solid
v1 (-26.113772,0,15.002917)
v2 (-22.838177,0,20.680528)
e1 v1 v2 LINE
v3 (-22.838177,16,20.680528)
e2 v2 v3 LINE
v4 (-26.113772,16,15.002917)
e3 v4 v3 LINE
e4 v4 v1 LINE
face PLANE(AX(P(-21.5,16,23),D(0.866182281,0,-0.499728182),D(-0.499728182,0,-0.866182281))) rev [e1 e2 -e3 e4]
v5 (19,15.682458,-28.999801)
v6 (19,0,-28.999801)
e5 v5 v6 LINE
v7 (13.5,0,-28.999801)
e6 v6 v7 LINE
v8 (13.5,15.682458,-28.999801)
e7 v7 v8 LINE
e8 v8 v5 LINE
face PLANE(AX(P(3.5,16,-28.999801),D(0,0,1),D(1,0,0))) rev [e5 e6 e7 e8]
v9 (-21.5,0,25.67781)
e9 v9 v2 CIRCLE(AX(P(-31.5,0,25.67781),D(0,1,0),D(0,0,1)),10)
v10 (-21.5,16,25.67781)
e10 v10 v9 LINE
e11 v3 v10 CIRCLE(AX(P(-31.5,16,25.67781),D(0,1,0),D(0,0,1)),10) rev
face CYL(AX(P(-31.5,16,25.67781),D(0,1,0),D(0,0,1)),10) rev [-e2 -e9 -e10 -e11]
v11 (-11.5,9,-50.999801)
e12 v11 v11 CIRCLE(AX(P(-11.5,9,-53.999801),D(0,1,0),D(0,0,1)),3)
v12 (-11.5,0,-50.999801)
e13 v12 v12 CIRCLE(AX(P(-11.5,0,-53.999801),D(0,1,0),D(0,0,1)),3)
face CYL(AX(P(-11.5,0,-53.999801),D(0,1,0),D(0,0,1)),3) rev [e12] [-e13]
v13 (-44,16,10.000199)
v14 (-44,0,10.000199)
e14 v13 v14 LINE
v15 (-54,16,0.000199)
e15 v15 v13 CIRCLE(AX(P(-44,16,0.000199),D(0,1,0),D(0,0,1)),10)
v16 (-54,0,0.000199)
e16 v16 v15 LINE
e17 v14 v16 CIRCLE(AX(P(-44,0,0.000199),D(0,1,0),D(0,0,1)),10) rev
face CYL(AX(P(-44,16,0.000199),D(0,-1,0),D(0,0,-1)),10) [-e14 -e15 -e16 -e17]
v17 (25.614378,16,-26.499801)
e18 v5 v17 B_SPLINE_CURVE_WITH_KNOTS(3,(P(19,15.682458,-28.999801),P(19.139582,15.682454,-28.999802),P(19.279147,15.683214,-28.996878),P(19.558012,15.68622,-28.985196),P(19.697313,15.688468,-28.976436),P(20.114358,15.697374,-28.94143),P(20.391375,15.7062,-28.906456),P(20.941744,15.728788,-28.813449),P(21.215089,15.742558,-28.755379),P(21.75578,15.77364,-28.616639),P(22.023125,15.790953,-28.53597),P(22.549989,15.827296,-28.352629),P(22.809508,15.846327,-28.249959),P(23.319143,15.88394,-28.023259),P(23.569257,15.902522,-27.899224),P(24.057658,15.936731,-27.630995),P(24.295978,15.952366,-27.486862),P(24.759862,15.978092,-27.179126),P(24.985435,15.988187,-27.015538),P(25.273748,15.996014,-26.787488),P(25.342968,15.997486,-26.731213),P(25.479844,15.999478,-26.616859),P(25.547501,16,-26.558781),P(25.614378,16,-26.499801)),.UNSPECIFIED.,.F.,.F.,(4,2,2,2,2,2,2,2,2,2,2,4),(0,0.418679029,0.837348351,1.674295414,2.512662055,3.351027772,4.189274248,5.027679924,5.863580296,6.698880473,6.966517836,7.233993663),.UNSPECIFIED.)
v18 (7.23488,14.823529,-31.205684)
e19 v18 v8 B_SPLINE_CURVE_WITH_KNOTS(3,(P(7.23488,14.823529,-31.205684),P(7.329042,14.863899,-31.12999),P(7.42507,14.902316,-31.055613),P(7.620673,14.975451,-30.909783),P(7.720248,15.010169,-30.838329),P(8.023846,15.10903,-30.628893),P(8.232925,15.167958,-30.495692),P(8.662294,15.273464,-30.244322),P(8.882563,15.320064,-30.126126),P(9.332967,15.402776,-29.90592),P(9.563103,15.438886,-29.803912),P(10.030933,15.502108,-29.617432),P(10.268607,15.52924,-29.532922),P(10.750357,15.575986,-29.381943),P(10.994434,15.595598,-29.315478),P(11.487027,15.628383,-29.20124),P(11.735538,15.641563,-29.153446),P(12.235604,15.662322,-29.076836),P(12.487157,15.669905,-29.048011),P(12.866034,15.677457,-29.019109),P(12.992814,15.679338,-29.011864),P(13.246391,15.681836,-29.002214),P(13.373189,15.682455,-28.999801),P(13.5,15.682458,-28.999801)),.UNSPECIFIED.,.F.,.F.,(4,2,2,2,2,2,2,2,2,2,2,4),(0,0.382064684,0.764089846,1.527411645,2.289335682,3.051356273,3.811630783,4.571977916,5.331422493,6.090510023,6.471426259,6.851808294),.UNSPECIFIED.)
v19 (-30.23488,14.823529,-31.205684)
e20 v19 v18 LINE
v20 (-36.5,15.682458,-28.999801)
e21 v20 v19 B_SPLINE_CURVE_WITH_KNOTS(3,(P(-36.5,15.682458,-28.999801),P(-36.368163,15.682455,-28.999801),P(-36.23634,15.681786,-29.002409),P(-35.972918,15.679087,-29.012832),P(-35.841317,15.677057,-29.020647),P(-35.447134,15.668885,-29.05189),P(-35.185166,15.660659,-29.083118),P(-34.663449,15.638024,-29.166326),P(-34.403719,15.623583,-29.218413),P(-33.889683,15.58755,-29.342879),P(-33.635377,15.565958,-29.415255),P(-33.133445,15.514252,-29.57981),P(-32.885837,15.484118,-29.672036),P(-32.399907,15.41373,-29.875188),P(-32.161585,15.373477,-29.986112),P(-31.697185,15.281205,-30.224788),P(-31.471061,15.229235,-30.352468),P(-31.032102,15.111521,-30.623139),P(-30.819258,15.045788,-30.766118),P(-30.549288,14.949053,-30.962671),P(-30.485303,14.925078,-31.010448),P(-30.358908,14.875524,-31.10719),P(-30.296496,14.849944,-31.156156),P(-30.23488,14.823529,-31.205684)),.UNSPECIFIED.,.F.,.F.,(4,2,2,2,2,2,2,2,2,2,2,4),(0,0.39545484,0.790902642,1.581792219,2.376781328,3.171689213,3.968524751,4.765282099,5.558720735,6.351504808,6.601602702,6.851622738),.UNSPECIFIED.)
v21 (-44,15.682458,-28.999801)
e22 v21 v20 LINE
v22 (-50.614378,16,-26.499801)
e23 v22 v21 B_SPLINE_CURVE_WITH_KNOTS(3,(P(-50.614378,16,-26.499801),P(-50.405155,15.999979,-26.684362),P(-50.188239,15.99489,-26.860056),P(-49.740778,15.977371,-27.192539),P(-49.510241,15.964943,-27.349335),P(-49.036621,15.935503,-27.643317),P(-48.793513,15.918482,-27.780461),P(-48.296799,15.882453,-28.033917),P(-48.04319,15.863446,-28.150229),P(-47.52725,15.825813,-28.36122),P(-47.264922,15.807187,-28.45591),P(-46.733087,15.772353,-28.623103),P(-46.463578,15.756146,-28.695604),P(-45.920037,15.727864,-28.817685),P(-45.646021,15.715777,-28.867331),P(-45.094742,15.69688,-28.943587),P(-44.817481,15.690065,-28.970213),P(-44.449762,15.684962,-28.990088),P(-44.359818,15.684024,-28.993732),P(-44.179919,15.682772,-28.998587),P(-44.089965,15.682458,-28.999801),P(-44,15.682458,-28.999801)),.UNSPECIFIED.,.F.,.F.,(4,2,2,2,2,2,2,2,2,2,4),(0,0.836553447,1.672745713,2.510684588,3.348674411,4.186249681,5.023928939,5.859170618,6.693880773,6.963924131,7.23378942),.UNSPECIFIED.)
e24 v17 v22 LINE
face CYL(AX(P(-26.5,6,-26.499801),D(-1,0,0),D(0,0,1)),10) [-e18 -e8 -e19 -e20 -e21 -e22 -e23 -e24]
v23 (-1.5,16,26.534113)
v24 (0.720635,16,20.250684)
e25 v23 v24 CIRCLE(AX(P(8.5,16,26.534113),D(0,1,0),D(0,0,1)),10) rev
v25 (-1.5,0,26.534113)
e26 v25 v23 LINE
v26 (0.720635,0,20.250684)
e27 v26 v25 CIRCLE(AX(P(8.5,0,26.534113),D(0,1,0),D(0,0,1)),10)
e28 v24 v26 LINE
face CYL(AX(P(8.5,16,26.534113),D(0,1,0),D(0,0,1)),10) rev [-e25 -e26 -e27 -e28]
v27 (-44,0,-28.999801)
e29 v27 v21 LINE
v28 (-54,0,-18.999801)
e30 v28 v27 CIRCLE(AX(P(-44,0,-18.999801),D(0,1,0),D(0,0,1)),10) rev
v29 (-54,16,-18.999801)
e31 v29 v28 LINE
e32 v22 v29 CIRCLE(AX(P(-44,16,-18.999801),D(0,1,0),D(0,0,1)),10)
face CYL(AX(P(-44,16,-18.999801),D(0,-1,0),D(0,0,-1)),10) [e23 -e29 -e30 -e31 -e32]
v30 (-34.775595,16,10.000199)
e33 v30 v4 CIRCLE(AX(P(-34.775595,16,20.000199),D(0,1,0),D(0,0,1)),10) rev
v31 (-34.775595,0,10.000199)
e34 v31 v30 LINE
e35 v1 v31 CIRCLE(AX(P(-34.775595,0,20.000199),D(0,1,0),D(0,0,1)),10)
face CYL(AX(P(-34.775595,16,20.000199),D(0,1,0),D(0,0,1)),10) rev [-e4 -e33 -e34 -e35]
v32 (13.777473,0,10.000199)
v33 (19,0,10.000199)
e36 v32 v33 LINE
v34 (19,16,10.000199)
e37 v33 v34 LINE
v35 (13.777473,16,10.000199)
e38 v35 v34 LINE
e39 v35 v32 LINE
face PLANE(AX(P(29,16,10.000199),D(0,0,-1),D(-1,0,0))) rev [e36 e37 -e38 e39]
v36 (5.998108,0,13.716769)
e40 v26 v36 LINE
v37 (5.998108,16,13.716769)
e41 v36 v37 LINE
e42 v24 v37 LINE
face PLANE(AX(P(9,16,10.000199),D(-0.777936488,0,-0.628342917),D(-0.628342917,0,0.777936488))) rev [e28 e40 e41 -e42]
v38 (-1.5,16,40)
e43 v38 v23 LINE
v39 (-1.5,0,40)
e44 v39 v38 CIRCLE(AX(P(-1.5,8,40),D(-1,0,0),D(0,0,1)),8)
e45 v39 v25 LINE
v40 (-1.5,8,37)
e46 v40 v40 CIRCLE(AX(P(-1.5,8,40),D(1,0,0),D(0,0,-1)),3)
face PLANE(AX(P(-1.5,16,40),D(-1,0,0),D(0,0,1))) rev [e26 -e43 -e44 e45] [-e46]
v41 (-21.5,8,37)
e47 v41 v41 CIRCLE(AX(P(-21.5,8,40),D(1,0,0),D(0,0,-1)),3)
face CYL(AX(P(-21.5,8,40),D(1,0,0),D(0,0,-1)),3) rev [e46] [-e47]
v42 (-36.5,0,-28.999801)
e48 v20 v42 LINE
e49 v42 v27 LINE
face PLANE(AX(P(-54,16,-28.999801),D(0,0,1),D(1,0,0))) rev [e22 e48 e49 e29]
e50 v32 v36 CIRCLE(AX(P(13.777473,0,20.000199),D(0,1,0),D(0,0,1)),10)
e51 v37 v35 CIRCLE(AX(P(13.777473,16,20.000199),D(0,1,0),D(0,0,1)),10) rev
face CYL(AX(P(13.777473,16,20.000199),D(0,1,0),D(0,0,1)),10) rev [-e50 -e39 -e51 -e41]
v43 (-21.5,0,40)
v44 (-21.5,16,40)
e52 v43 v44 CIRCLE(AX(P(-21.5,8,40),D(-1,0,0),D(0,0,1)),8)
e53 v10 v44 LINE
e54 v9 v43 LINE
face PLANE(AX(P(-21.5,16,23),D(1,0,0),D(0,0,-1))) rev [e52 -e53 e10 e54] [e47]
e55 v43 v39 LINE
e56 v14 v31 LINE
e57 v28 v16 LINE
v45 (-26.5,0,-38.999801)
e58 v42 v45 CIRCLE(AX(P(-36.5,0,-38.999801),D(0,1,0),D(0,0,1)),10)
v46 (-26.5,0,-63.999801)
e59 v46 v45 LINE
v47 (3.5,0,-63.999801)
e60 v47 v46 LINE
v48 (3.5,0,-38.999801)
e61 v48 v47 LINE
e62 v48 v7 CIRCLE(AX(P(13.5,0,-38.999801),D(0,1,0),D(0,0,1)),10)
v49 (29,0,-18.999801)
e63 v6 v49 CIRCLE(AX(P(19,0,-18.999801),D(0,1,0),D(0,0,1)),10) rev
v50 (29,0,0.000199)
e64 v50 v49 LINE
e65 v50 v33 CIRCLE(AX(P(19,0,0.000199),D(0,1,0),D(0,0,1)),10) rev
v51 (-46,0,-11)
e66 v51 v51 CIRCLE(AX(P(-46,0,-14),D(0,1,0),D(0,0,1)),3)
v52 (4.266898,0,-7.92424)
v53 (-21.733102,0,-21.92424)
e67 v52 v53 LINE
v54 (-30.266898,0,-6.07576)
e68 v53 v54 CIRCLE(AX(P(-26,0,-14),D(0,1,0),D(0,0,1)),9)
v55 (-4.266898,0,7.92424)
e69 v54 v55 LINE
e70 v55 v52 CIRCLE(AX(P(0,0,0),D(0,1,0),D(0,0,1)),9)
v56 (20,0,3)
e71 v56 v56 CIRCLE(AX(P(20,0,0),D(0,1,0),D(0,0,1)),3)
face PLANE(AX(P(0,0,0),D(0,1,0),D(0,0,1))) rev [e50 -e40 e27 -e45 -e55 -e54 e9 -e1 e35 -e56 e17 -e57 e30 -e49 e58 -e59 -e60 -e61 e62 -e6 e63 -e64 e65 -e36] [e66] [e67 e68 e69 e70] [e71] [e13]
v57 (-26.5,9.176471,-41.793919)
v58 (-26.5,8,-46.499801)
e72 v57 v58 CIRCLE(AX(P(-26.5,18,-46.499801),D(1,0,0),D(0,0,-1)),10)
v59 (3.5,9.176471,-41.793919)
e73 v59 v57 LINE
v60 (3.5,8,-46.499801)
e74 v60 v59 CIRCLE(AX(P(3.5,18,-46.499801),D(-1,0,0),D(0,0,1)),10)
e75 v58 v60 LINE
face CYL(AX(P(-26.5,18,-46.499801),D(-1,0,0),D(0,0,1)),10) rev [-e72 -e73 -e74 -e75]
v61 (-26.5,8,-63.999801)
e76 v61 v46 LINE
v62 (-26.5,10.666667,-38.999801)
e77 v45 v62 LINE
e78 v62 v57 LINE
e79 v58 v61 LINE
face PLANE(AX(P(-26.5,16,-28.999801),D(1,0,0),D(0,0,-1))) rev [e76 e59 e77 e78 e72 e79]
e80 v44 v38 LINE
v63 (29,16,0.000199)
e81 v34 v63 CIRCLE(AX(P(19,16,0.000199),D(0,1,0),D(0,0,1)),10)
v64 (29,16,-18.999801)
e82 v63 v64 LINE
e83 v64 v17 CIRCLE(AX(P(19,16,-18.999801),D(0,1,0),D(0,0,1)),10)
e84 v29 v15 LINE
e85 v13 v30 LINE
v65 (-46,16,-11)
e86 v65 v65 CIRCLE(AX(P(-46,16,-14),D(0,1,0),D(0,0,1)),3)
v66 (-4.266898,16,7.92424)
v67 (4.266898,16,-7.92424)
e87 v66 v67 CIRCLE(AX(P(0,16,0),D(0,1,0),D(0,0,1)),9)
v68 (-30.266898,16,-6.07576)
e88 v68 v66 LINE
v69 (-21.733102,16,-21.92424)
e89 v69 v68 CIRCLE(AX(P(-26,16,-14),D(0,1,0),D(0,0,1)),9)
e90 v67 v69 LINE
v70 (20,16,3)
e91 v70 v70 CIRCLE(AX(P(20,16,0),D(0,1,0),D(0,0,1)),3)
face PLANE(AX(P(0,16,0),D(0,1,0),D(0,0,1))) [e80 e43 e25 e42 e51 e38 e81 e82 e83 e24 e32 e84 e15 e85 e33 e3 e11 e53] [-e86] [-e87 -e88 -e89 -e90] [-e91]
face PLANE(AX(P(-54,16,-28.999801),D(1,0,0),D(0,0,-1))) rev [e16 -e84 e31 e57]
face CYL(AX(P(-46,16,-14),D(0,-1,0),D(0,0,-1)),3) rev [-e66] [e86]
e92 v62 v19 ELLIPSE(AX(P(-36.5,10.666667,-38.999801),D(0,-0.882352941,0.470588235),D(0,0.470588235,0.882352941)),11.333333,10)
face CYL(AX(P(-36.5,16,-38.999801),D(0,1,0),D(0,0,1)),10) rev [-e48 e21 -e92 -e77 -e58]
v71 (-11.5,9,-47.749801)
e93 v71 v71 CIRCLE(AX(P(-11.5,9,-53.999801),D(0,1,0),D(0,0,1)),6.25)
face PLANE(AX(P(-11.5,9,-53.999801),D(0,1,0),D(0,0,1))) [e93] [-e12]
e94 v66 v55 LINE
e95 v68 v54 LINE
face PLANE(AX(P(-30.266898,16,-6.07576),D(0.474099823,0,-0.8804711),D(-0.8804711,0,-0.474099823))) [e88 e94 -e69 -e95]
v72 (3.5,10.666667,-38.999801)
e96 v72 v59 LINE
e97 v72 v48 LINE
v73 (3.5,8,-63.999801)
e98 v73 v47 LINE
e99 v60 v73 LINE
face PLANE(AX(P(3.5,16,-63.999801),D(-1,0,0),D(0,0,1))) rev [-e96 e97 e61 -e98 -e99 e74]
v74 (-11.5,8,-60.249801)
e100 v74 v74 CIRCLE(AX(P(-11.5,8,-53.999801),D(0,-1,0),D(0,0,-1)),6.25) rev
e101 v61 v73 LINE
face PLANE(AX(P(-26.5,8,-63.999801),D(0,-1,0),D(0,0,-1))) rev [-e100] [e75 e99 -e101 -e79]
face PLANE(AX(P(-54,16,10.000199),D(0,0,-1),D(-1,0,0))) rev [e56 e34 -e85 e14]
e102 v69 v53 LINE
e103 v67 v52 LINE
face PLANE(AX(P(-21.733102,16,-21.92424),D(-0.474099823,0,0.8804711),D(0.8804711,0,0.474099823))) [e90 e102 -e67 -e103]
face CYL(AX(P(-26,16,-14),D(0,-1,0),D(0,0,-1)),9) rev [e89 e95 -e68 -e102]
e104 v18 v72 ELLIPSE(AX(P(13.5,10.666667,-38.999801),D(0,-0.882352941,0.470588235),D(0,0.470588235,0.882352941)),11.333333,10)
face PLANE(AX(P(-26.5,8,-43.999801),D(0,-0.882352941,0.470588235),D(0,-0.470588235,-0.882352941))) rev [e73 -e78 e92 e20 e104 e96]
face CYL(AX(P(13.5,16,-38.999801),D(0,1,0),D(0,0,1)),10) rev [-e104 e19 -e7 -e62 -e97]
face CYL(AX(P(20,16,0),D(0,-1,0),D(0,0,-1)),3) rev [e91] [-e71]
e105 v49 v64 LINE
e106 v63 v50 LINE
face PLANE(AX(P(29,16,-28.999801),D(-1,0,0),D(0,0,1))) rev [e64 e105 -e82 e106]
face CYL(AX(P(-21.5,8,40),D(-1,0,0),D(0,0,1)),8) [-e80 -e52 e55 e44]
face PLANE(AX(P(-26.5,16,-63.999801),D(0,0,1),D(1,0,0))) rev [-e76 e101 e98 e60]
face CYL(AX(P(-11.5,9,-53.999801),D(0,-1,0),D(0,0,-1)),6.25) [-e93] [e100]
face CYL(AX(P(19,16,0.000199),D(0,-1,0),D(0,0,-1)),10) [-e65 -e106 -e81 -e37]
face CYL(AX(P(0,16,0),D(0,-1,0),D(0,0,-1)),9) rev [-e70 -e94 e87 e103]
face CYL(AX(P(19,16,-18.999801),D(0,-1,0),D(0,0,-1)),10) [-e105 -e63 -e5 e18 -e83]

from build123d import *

# Parameters (mm, degrees)
SKETCH_1_R          = 3
EXTRUDE_1_DEPTH     = 16
SKETCH_5_W          = 20
SKETCH_5_H          = 8
REVOLVE_1_ANGLE     = 180
SKETCH_6_R          = 3
CUT_EXTRUDE_4_DEPTH = 20
CUT_EXTRUDE_3_DEPTH = 30
SKETCH_7_R          = 3
CUT_EXTRUDE_5_DEPTH = 85.118812266
EXTRUDE_START       = 1
SKETCH_9_R          = 6.25
SKETCH_9_R_2        = 3
EXTRUDE_2_DEPTH     = 1
FILLET_1_R          = 10
FILLET_START        = -52
FILLET_2_DEPTH      = 79
FILLET_START_2      = -26.5
FILLET_2_2_DEPTH    = 30


with BuildPart() as part:
    # 草图1 → 凸台-拉伸1 (new body)
    with BuildSketch(Plane(origin=(0, 0, 0), x_dir=(1, 0, 0), z_dir=(0, 1, 0))):
        Polygon((-54, -10.000198617), (-29, -10.000198617), (-21.5, -23), (-21.5, -40), (-1.5, -40), (-1.5, -23), (9, -10.000198617), (29, -10.000198617), (29, 28.999801383), (3.5, 28.999801383), (3.5, 63.999801383), (-26.5, 63.999801383), (-26.5, 28.999801383), (-54, 28.999801383), align=None)
        with Locations(Location((-46, 14, 0), (0, 0, 270))):
            Circle(SKETCH_1_R, mode=Mode.SUBTRACT)
        with Locations(Location((20, 0, 0), (0, 0, 270))):
            Circle(SKETCH_1_R, mode=Mode.SUBTRACT)
        with BuildLine():
            Line((-30.266898407, 6.075760101), (-4.266898407, -7.924239899))
            ThreePointArc((-4.266898407, -7.924239899), (7.924239899, -4.266898407), (4.266898407, 7.924239899))
            Line((4.266898407, 7.924239899), (-21.733101593, 21.924239899))
            ThreePointArc((-21.733101593, 21.924239899), (-33.924239899, 18.266898407), (-30.266898407, 6.075760101))
        make_face(mode=Mode.SUBTRACT)
    extrude(amount=EXTRUDE_1_DEPTH)

    # 草图5 → 旋转1 (revolve)
    with BuildSketch(Plane.XY.offset(40)):
        with Locations((-11.5, 12)):
            Rectangle(SKETCH_5_W, SKETCH_5_H)
    revolve(axis=Axis((-21.5, 8, 40), (1, 0, 0)), revolution_arc=REVOLVE_1_ANGLE)

    # 草图6 → 切除-拉伸4 (cut)
    with BuildSketch(Plane(origin=(-1.5, 0, 0), x_dir=(0, 0, -1), z_dir=(1, 0, 0))):
        with Locations((-40, 8)):
            Circle(SKETCH_6_R)
    extrude(amount=-CUT_EXTRUDE_4_DEPTH, mode=Mode.SUBTRACT)

    # 草图4 → 切除-拉伸3 (cut)
    with BuildSketch(Plane(origin=(3.5, 0, 0), x_dir=(0, 0, -1), z_dir=(1, 0, 0))):
        Polygon((28.999801383, 16), (63.999801383, 16), (63.999801383, 8), (43.999801383, 8), align=None)
    extrude(amount=-CUT_EXTRUDE_3_DEPTH, mode=Mode.SUBTRACT)

    # 草图7 → 切除-拉伸5 (cut, through all)
    with BuildSketch(Plane(origin=(0, 8, 0), x_dir=(1, 0, 0), z_dir=(0, 1, 0))):
        with Locations(Location((-11.5, 53.999801383, 0), (0, 0, 270))):
            Circle(SKETCH_7_R)
    extrude(amount=-CUT_EXTRUDE_5_DEPTH, mode=Mode.SUBTRACT)

    # 草图9 → 凸台-拉伸2 (add)
    with BuildSketch(Plane(origin=(0, 8, 0), x_dir=(1, 0, 0), z_dir=(0, 1, 0)).offset(EXTRUDE_START)):
        with Locations(Location((-11.5, 53.999801383, 0), (0, 0, 90))):
            Circle(SKETCH_9_R)
        with Locations(Location((-11.5, 53.999801383, 0), (0, 0, 270))):
            Circle(SKETCH_9_R_2, mode=Mode.SUBTRACT)
    extrude(amount=-EXTRUDE_2_DEPTH)

    # 圆角1
    fillet_1_edges = [part.edges().sort_by_distance(p)[0] for p in [
        (-21.5, 8, 23),
        (-29, 8, 10.000198617),
        (-54, 8, 10.000198617),
        (-54, 8, -28.999801383),
        (-26.5, 8, -28.999801383),
        (3.5, 8, -28.999801383),
        (29, 8, -28.999801383),
        (29, 8, 10.000198617),
        (9, 8, 10.000198617),
        (-1.5, 8, 23),
    ]]
    fillet(fillet_1_edges, radius=FILLET_1_R)

    # 圆角2: read off the stored shape, not the designer's step
    # 圆角2 outline → 圆角2 (cut)
    with BuildSketch(Plane.YZ.offset(FILLET_START)):
        with BuildLine():
            Line((14.823529412, -31.205683736), (16, -28.999801383))
            Line((16, -28.999801383), (16, -26.499801383))
            ThreePointArc((16, -26.499801383), (15.701425001, -28.925157633), (14.823529412, -31.205683736))
        make_face()
    extrude(amount=FILLET_2_DEPTH, mode=Mode.SUBTRACT)

    # Fillet 2 2 outline → Fillet 2 2 (add)
    with BuildSketch(Plane.YZ.offset(FILLET_START_2)):
        with BuildLine():
            Line((8, -43.999801383), (8, -46.499801383))
            ThreePointArc((8, -46.499801383), (8.298574999, -44.074445133), (9.176470588, -41.79391903))
            Line((9.176470588, -41.79391903), (8, -43.999801383))
        make_face()
    extrude(amount=FILLET_2_2_DEPTH)


solid = part.part
